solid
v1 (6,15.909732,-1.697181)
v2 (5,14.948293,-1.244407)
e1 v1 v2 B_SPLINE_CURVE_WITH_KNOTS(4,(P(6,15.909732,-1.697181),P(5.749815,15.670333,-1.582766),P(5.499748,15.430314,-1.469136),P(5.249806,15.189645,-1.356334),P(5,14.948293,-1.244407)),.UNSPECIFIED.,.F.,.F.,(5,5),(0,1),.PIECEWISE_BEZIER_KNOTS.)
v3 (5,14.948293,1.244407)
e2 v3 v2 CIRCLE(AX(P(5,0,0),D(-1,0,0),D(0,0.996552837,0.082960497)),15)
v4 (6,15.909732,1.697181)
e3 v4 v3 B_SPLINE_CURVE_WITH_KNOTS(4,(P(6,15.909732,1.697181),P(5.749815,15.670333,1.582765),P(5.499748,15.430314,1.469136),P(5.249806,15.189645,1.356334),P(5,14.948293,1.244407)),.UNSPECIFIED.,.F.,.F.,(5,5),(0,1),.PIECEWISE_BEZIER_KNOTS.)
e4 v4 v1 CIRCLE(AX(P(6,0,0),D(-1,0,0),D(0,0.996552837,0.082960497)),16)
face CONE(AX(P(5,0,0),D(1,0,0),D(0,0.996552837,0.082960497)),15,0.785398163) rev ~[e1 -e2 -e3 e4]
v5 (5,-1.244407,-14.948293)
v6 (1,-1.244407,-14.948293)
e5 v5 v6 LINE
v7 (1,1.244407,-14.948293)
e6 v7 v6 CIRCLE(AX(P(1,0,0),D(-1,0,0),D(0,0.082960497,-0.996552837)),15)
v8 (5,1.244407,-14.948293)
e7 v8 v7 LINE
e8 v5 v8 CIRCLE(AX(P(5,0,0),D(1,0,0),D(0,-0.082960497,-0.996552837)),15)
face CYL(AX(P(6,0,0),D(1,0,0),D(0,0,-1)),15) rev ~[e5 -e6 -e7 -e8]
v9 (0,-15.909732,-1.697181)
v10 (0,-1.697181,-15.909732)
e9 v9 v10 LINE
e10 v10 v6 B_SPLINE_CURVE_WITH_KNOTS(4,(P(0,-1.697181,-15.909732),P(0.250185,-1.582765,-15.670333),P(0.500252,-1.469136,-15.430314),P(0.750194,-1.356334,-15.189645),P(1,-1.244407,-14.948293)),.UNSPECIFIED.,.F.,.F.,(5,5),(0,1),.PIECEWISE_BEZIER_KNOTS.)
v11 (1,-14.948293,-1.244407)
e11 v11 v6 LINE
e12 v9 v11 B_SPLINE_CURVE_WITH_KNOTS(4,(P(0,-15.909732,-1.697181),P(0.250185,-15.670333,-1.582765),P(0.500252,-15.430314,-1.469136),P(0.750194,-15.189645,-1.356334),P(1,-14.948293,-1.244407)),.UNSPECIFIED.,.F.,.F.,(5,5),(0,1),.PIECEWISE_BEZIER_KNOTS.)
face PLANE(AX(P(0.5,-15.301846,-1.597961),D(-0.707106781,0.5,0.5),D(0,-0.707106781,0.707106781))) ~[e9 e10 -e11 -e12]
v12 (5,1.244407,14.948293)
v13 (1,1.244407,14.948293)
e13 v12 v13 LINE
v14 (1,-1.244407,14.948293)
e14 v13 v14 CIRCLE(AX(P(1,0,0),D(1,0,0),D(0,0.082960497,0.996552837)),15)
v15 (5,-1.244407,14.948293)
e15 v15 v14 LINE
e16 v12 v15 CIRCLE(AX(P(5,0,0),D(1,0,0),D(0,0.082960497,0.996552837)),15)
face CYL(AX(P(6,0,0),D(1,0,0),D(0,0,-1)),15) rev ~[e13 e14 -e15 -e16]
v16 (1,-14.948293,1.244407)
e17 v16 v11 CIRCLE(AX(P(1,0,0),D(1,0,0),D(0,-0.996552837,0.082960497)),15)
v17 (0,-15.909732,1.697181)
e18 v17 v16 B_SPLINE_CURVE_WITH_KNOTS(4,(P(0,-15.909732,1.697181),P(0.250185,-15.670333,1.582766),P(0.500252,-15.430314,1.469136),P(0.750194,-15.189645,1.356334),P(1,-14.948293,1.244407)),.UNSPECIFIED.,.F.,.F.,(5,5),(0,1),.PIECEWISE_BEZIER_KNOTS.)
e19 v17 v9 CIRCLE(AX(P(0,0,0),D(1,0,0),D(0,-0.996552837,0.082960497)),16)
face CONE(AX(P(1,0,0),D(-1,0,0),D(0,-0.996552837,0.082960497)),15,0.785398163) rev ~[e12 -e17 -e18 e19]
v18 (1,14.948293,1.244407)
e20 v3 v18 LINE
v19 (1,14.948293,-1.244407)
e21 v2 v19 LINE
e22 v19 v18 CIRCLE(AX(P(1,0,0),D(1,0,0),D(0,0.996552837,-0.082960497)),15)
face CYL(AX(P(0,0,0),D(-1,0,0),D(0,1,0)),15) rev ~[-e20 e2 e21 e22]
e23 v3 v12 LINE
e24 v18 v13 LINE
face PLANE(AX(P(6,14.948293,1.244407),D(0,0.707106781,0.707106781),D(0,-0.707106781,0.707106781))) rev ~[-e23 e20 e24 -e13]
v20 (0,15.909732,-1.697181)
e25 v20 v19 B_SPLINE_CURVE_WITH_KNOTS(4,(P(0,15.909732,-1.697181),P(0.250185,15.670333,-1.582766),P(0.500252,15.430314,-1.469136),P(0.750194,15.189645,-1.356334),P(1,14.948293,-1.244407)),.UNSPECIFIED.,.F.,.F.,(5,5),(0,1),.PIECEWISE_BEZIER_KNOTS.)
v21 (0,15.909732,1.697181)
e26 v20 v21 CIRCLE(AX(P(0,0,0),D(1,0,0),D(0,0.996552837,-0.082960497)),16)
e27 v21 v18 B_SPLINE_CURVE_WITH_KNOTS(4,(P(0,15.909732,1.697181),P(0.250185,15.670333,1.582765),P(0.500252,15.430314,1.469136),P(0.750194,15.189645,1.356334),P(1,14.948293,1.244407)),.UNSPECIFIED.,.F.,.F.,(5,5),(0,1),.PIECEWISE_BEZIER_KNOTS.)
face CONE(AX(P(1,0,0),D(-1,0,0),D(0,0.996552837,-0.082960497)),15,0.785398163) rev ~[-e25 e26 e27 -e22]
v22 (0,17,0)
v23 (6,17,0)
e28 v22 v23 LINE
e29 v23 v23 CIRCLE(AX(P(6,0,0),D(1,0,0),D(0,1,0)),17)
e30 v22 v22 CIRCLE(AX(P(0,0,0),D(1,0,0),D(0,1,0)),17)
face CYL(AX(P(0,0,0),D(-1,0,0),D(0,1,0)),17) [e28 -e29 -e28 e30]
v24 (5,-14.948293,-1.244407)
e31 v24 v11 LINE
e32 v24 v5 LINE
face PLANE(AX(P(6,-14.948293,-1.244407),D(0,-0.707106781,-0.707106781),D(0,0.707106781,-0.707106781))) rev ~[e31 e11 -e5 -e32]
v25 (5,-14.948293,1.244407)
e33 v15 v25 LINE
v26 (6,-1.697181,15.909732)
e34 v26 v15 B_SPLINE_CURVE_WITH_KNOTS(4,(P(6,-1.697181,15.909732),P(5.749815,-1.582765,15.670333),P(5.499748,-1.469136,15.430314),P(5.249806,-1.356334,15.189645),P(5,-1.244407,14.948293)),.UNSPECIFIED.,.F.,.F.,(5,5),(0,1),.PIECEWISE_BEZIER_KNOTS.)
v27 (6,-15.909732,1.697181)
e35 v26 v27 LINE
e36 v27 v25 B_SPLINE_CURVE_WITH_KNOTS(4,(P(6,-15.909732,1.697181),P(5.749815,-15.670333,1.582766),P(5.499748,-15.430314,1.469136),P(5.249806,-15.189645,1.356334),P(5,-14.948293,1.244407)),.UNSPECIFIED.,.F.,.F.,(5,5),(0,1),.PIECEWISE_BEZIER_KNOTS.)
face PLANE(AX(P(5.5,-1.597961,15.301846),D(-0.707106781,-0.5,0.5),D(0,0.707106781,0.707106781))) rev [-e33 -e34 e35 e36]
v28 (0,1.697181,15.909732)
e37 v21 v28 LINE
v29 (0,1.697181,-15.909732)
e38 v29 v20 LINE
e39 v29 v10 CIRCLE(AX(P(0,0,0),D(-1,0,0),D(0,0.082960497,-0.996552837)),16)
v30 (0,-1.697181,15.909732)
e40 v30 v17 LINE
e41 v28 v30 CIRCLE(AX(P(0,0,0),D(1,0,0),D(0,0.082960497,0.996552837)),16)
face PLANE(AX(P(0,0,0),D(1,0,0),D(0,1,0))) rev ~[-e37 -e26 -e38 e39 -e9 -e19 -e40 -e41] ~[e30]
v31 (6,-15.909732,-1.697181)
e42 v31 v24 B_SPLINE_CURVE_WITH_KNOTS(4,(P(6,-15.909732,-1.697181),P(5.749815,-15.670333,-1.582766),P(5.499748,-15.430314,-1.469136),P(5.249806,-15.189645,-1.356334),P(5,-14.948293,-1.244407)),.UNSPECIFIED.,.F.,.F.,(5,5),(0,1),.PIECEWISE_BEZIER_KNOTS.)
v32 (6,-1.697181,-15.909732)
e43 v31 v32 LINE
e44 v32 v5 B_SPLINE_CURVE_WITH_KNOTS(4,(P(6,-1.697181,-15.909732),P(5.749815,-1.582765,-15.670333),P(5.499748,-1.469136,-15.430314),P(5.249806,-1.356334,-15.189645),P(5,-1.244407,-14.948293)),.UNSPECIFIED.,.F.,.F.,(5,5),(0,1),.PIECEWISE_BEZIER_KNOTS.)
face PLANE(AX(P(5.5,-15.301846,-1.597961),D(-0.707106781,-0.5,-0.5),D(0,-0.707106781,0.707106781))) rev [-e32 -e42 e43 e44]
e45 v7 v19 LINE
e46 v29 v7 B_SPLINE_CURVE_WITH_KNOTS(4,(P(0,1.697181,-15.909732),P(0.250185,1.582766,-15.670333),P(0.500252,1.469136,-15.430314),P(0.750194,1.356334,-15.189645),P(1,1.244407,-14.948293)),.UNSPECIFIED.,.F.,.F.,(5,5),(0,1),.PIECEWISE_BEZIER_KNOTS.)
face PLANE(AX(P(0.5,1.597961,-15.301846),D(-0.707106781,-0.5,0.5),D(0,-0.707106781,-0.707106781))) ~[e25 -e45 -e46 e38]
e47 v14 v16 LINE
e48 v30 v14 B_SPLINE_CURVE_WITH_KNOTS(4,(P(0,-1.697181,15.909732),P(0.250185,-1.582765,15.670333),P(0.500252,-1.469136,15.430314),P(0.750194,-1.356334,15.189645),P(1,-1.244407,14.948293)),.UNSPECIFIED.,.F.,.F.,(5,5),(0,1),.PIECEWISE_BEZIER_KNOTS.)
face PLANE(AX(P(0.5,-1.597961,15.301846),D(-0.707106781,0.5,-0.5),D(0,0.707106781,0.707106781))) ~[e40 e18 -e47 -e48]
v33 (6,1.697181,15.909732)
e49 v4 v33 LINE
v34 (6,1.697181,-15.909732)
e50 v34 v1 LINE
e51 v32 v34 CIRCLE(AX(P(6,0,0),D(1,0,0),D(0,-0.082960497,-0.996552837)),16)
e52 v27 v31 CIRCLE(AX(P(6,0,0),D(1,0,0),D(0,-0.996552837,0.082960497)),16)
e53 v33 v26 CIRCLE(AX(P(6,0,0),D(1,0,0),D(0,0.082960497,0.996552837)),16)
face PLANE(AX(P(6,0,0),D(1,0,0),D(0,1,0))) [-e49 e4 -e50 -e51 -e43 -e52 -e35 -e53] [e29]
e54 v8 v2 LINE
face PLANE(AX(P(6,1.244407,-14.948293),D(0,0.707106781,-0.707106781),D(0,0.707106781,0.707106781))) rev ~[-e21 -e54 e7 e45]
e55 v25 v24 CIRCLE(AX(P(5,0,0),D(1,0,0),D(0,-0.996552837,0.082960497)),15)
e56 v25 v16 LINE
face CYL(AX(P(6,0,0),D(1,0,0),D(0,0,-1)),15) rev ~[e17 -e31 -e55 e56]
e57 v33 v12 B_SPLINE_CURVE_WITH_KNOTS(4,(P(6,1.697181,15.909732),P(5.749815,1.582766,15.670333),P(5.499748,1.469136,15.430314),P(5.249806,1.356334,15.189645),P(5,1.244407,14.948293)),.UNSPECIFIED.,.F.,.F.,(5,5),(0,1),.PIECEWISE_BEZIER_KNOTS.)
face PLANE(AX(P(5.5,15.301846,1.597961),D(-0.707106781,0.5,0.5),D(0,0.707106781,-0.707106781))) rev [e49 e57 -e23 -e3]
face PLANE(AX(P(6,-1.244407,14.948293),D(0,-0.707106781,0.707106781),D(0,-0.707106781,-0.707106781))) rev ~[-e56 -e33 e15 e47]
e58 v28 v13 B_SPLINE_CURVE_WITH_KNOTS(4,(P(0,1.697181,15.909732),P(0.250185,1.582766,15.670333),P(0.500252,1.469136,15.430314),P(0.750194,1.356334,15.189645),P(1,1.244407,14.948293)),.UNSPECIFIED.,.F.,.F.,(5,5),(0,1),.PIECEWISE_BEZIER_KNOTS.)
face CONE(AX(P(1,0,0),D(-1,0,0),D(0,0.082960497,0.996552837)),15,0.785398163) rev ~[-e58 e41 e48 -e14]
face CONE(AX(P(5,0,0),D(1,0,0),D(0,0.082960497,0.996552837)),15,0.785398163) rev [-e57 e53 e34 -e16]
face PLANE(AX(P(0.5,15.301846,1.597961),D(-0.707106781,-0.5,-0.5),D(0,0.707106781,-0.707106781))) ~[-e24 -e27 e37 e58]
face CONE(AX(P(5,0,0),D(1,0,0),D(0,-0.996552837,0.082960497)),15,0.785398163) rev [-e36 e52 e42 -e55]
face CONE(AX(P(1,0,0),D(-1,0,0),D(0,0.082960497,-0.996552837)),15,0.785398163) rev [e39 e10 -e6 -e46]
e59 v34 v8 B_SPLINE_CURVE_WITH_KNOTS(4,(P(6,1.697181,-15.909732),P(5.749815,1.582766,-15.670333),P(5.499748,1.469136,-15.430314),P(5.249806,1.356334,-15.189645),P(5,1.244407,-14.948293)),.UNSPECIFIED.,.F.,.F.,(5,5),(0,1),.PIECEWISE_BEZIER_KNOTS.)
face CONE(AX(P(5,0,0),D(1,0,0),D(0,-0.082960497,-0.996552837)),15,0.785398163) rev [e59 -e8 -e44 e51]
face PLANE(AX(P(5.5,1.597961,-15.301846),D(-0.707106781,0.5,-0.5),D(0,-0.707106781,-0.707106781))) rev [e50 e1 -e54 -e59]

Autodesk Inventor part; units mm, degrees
ref_plane "YZ Plane" through (0, 0, 0) normal (1, 0, 0) x (0, 1, 0)
ref_plane "XZ Plane" through (0, 0, 0) normal (0, 1, 0) x (-1, 0, 0)
ref_plane "XY Plane" through (0, 0, 0) normal (0, 0, 1) x (1, 0, 0)
sketch "스케치1" plane through (0, 0, 0) normal (1, 0, 0) x (0, 1, 0)
  circle A0 centre (0, 0) radius 15
  circle A1 centre (0, 0) radius 17
  dimension "d0" = 30
  dimension "d1" = 2
extrude "돌출1" add sketch "스케치1" along normal blind 6
sketch "스케치2" plane through (6, 0, 0) normal (1, 0, 0) x (0, 0, -1)
  line L0 (0, -16.1927) -> (16.1927, 0)
  line L1 (16.1927, 0) -> (0, 16.1927)
  line L2 (0, 16.1927) -> (-16.1927, 0)
  line L3 (-16.1927, 0) -> (0, -16.1927)
  line L4 (0, -16.1927) -> (0, 16.1927) construction
  line L5 (16.1927, 0) -> (-16.1927, 0) construction
  circle A0 centre (0, 0) radius 15 projected
  point P0 (-14.9483, -1.2445)
  point P1 (-14.9483, 1.2445)
  point P2 (-1.2445, 14.9483)
  point P3 (1.2445, 14.9483)
  point P4 (1.2445, -14.9483)
  point P5 (-1.2445, -14.9483)
  point P6 (14.9483, 1.2445)
  point P7 (14.9483, -1.2445)
  dimension "d4" = 22.9
  dimension "d5" = 22.9
extrude "돌출2" add sketch "스케치2" against normal up to surface (6 mm away) contours L3 A0 L0 | L0 A0 | A0 L3 | A0 L1 L0 | L3 L2 A0 | A0 L2 | L1 A0 | L2 L1 A0
chamfer "모따기1" distance 1 angle 45 16 edges at (6, -8.0964, -8.0964) (0, -8.0964, -8.0964) (6, -8.0964, 8.0964) (0, -8.0964, 8.0964) (6, -15, 0) (0, -15, 0) (0, 0, 15) (6, 0, 15) (6, 8.0964, 8.0964) (0, 8.0964, 8.0964) (6, 8.0964, -8.0964) (0, 8.0964, -8.0964) (6, 15, 0) (0, 15, 0) (0, 0, -15) (6, 0, -15)
equation "\"d5\" = d4"
equation "\"joint4_belt_centor\" = 157.367"
equation "\"joint4_axis2_L\" = 58.803"
equation "\"joint4_axis2_b1\" = 35"
equation "\"joint4_axis2_d\" = 19"
equation "\"joint4_miter_m\" = 2"
equation "\"joint4_miter_a\" = 20deg"
equation "\"joint4_miter_z\" = 79"
equation "\"joint4_miter_b\" = 6.90139"
equation "\"joint4_axis3_L\" = 23.5"
equation "\"joint3_belt_centor\" = 157.367"
equation "\"joint3_axis2_L\" = 63.75"
equation "\"joint3_axis2_b1\" = 38"
equation "\"joint3_axis2_d\" = 29"
equation "\"joint3_planetary_m\" = 2"
equation "\"joint3_planetary_a\" = 20deg"
equation "\"joint3_planetary_np\" = 4"
equation "\"joint3_sun_b\" = 19"
equation "\"joint3_planet_b\" = 19"
equation "\"joint3_ring_b\" = 18"
equation "\"joint3_axis3_d\" = 29"
equation "\"joint3_miter_m\" = 4"
equation "\"joint3_miter_a\" = 20deg"
equation "\"joint3_miter_z1\" = 26"
equation "\"joint3_miter_z2\" = 39"
equation "\"joint3_miter_b\" = 25.07657"
equation "\"joint3_axis4_L\" = 43.706"
properties part number "joint3_washer1" material "PLA filament"
